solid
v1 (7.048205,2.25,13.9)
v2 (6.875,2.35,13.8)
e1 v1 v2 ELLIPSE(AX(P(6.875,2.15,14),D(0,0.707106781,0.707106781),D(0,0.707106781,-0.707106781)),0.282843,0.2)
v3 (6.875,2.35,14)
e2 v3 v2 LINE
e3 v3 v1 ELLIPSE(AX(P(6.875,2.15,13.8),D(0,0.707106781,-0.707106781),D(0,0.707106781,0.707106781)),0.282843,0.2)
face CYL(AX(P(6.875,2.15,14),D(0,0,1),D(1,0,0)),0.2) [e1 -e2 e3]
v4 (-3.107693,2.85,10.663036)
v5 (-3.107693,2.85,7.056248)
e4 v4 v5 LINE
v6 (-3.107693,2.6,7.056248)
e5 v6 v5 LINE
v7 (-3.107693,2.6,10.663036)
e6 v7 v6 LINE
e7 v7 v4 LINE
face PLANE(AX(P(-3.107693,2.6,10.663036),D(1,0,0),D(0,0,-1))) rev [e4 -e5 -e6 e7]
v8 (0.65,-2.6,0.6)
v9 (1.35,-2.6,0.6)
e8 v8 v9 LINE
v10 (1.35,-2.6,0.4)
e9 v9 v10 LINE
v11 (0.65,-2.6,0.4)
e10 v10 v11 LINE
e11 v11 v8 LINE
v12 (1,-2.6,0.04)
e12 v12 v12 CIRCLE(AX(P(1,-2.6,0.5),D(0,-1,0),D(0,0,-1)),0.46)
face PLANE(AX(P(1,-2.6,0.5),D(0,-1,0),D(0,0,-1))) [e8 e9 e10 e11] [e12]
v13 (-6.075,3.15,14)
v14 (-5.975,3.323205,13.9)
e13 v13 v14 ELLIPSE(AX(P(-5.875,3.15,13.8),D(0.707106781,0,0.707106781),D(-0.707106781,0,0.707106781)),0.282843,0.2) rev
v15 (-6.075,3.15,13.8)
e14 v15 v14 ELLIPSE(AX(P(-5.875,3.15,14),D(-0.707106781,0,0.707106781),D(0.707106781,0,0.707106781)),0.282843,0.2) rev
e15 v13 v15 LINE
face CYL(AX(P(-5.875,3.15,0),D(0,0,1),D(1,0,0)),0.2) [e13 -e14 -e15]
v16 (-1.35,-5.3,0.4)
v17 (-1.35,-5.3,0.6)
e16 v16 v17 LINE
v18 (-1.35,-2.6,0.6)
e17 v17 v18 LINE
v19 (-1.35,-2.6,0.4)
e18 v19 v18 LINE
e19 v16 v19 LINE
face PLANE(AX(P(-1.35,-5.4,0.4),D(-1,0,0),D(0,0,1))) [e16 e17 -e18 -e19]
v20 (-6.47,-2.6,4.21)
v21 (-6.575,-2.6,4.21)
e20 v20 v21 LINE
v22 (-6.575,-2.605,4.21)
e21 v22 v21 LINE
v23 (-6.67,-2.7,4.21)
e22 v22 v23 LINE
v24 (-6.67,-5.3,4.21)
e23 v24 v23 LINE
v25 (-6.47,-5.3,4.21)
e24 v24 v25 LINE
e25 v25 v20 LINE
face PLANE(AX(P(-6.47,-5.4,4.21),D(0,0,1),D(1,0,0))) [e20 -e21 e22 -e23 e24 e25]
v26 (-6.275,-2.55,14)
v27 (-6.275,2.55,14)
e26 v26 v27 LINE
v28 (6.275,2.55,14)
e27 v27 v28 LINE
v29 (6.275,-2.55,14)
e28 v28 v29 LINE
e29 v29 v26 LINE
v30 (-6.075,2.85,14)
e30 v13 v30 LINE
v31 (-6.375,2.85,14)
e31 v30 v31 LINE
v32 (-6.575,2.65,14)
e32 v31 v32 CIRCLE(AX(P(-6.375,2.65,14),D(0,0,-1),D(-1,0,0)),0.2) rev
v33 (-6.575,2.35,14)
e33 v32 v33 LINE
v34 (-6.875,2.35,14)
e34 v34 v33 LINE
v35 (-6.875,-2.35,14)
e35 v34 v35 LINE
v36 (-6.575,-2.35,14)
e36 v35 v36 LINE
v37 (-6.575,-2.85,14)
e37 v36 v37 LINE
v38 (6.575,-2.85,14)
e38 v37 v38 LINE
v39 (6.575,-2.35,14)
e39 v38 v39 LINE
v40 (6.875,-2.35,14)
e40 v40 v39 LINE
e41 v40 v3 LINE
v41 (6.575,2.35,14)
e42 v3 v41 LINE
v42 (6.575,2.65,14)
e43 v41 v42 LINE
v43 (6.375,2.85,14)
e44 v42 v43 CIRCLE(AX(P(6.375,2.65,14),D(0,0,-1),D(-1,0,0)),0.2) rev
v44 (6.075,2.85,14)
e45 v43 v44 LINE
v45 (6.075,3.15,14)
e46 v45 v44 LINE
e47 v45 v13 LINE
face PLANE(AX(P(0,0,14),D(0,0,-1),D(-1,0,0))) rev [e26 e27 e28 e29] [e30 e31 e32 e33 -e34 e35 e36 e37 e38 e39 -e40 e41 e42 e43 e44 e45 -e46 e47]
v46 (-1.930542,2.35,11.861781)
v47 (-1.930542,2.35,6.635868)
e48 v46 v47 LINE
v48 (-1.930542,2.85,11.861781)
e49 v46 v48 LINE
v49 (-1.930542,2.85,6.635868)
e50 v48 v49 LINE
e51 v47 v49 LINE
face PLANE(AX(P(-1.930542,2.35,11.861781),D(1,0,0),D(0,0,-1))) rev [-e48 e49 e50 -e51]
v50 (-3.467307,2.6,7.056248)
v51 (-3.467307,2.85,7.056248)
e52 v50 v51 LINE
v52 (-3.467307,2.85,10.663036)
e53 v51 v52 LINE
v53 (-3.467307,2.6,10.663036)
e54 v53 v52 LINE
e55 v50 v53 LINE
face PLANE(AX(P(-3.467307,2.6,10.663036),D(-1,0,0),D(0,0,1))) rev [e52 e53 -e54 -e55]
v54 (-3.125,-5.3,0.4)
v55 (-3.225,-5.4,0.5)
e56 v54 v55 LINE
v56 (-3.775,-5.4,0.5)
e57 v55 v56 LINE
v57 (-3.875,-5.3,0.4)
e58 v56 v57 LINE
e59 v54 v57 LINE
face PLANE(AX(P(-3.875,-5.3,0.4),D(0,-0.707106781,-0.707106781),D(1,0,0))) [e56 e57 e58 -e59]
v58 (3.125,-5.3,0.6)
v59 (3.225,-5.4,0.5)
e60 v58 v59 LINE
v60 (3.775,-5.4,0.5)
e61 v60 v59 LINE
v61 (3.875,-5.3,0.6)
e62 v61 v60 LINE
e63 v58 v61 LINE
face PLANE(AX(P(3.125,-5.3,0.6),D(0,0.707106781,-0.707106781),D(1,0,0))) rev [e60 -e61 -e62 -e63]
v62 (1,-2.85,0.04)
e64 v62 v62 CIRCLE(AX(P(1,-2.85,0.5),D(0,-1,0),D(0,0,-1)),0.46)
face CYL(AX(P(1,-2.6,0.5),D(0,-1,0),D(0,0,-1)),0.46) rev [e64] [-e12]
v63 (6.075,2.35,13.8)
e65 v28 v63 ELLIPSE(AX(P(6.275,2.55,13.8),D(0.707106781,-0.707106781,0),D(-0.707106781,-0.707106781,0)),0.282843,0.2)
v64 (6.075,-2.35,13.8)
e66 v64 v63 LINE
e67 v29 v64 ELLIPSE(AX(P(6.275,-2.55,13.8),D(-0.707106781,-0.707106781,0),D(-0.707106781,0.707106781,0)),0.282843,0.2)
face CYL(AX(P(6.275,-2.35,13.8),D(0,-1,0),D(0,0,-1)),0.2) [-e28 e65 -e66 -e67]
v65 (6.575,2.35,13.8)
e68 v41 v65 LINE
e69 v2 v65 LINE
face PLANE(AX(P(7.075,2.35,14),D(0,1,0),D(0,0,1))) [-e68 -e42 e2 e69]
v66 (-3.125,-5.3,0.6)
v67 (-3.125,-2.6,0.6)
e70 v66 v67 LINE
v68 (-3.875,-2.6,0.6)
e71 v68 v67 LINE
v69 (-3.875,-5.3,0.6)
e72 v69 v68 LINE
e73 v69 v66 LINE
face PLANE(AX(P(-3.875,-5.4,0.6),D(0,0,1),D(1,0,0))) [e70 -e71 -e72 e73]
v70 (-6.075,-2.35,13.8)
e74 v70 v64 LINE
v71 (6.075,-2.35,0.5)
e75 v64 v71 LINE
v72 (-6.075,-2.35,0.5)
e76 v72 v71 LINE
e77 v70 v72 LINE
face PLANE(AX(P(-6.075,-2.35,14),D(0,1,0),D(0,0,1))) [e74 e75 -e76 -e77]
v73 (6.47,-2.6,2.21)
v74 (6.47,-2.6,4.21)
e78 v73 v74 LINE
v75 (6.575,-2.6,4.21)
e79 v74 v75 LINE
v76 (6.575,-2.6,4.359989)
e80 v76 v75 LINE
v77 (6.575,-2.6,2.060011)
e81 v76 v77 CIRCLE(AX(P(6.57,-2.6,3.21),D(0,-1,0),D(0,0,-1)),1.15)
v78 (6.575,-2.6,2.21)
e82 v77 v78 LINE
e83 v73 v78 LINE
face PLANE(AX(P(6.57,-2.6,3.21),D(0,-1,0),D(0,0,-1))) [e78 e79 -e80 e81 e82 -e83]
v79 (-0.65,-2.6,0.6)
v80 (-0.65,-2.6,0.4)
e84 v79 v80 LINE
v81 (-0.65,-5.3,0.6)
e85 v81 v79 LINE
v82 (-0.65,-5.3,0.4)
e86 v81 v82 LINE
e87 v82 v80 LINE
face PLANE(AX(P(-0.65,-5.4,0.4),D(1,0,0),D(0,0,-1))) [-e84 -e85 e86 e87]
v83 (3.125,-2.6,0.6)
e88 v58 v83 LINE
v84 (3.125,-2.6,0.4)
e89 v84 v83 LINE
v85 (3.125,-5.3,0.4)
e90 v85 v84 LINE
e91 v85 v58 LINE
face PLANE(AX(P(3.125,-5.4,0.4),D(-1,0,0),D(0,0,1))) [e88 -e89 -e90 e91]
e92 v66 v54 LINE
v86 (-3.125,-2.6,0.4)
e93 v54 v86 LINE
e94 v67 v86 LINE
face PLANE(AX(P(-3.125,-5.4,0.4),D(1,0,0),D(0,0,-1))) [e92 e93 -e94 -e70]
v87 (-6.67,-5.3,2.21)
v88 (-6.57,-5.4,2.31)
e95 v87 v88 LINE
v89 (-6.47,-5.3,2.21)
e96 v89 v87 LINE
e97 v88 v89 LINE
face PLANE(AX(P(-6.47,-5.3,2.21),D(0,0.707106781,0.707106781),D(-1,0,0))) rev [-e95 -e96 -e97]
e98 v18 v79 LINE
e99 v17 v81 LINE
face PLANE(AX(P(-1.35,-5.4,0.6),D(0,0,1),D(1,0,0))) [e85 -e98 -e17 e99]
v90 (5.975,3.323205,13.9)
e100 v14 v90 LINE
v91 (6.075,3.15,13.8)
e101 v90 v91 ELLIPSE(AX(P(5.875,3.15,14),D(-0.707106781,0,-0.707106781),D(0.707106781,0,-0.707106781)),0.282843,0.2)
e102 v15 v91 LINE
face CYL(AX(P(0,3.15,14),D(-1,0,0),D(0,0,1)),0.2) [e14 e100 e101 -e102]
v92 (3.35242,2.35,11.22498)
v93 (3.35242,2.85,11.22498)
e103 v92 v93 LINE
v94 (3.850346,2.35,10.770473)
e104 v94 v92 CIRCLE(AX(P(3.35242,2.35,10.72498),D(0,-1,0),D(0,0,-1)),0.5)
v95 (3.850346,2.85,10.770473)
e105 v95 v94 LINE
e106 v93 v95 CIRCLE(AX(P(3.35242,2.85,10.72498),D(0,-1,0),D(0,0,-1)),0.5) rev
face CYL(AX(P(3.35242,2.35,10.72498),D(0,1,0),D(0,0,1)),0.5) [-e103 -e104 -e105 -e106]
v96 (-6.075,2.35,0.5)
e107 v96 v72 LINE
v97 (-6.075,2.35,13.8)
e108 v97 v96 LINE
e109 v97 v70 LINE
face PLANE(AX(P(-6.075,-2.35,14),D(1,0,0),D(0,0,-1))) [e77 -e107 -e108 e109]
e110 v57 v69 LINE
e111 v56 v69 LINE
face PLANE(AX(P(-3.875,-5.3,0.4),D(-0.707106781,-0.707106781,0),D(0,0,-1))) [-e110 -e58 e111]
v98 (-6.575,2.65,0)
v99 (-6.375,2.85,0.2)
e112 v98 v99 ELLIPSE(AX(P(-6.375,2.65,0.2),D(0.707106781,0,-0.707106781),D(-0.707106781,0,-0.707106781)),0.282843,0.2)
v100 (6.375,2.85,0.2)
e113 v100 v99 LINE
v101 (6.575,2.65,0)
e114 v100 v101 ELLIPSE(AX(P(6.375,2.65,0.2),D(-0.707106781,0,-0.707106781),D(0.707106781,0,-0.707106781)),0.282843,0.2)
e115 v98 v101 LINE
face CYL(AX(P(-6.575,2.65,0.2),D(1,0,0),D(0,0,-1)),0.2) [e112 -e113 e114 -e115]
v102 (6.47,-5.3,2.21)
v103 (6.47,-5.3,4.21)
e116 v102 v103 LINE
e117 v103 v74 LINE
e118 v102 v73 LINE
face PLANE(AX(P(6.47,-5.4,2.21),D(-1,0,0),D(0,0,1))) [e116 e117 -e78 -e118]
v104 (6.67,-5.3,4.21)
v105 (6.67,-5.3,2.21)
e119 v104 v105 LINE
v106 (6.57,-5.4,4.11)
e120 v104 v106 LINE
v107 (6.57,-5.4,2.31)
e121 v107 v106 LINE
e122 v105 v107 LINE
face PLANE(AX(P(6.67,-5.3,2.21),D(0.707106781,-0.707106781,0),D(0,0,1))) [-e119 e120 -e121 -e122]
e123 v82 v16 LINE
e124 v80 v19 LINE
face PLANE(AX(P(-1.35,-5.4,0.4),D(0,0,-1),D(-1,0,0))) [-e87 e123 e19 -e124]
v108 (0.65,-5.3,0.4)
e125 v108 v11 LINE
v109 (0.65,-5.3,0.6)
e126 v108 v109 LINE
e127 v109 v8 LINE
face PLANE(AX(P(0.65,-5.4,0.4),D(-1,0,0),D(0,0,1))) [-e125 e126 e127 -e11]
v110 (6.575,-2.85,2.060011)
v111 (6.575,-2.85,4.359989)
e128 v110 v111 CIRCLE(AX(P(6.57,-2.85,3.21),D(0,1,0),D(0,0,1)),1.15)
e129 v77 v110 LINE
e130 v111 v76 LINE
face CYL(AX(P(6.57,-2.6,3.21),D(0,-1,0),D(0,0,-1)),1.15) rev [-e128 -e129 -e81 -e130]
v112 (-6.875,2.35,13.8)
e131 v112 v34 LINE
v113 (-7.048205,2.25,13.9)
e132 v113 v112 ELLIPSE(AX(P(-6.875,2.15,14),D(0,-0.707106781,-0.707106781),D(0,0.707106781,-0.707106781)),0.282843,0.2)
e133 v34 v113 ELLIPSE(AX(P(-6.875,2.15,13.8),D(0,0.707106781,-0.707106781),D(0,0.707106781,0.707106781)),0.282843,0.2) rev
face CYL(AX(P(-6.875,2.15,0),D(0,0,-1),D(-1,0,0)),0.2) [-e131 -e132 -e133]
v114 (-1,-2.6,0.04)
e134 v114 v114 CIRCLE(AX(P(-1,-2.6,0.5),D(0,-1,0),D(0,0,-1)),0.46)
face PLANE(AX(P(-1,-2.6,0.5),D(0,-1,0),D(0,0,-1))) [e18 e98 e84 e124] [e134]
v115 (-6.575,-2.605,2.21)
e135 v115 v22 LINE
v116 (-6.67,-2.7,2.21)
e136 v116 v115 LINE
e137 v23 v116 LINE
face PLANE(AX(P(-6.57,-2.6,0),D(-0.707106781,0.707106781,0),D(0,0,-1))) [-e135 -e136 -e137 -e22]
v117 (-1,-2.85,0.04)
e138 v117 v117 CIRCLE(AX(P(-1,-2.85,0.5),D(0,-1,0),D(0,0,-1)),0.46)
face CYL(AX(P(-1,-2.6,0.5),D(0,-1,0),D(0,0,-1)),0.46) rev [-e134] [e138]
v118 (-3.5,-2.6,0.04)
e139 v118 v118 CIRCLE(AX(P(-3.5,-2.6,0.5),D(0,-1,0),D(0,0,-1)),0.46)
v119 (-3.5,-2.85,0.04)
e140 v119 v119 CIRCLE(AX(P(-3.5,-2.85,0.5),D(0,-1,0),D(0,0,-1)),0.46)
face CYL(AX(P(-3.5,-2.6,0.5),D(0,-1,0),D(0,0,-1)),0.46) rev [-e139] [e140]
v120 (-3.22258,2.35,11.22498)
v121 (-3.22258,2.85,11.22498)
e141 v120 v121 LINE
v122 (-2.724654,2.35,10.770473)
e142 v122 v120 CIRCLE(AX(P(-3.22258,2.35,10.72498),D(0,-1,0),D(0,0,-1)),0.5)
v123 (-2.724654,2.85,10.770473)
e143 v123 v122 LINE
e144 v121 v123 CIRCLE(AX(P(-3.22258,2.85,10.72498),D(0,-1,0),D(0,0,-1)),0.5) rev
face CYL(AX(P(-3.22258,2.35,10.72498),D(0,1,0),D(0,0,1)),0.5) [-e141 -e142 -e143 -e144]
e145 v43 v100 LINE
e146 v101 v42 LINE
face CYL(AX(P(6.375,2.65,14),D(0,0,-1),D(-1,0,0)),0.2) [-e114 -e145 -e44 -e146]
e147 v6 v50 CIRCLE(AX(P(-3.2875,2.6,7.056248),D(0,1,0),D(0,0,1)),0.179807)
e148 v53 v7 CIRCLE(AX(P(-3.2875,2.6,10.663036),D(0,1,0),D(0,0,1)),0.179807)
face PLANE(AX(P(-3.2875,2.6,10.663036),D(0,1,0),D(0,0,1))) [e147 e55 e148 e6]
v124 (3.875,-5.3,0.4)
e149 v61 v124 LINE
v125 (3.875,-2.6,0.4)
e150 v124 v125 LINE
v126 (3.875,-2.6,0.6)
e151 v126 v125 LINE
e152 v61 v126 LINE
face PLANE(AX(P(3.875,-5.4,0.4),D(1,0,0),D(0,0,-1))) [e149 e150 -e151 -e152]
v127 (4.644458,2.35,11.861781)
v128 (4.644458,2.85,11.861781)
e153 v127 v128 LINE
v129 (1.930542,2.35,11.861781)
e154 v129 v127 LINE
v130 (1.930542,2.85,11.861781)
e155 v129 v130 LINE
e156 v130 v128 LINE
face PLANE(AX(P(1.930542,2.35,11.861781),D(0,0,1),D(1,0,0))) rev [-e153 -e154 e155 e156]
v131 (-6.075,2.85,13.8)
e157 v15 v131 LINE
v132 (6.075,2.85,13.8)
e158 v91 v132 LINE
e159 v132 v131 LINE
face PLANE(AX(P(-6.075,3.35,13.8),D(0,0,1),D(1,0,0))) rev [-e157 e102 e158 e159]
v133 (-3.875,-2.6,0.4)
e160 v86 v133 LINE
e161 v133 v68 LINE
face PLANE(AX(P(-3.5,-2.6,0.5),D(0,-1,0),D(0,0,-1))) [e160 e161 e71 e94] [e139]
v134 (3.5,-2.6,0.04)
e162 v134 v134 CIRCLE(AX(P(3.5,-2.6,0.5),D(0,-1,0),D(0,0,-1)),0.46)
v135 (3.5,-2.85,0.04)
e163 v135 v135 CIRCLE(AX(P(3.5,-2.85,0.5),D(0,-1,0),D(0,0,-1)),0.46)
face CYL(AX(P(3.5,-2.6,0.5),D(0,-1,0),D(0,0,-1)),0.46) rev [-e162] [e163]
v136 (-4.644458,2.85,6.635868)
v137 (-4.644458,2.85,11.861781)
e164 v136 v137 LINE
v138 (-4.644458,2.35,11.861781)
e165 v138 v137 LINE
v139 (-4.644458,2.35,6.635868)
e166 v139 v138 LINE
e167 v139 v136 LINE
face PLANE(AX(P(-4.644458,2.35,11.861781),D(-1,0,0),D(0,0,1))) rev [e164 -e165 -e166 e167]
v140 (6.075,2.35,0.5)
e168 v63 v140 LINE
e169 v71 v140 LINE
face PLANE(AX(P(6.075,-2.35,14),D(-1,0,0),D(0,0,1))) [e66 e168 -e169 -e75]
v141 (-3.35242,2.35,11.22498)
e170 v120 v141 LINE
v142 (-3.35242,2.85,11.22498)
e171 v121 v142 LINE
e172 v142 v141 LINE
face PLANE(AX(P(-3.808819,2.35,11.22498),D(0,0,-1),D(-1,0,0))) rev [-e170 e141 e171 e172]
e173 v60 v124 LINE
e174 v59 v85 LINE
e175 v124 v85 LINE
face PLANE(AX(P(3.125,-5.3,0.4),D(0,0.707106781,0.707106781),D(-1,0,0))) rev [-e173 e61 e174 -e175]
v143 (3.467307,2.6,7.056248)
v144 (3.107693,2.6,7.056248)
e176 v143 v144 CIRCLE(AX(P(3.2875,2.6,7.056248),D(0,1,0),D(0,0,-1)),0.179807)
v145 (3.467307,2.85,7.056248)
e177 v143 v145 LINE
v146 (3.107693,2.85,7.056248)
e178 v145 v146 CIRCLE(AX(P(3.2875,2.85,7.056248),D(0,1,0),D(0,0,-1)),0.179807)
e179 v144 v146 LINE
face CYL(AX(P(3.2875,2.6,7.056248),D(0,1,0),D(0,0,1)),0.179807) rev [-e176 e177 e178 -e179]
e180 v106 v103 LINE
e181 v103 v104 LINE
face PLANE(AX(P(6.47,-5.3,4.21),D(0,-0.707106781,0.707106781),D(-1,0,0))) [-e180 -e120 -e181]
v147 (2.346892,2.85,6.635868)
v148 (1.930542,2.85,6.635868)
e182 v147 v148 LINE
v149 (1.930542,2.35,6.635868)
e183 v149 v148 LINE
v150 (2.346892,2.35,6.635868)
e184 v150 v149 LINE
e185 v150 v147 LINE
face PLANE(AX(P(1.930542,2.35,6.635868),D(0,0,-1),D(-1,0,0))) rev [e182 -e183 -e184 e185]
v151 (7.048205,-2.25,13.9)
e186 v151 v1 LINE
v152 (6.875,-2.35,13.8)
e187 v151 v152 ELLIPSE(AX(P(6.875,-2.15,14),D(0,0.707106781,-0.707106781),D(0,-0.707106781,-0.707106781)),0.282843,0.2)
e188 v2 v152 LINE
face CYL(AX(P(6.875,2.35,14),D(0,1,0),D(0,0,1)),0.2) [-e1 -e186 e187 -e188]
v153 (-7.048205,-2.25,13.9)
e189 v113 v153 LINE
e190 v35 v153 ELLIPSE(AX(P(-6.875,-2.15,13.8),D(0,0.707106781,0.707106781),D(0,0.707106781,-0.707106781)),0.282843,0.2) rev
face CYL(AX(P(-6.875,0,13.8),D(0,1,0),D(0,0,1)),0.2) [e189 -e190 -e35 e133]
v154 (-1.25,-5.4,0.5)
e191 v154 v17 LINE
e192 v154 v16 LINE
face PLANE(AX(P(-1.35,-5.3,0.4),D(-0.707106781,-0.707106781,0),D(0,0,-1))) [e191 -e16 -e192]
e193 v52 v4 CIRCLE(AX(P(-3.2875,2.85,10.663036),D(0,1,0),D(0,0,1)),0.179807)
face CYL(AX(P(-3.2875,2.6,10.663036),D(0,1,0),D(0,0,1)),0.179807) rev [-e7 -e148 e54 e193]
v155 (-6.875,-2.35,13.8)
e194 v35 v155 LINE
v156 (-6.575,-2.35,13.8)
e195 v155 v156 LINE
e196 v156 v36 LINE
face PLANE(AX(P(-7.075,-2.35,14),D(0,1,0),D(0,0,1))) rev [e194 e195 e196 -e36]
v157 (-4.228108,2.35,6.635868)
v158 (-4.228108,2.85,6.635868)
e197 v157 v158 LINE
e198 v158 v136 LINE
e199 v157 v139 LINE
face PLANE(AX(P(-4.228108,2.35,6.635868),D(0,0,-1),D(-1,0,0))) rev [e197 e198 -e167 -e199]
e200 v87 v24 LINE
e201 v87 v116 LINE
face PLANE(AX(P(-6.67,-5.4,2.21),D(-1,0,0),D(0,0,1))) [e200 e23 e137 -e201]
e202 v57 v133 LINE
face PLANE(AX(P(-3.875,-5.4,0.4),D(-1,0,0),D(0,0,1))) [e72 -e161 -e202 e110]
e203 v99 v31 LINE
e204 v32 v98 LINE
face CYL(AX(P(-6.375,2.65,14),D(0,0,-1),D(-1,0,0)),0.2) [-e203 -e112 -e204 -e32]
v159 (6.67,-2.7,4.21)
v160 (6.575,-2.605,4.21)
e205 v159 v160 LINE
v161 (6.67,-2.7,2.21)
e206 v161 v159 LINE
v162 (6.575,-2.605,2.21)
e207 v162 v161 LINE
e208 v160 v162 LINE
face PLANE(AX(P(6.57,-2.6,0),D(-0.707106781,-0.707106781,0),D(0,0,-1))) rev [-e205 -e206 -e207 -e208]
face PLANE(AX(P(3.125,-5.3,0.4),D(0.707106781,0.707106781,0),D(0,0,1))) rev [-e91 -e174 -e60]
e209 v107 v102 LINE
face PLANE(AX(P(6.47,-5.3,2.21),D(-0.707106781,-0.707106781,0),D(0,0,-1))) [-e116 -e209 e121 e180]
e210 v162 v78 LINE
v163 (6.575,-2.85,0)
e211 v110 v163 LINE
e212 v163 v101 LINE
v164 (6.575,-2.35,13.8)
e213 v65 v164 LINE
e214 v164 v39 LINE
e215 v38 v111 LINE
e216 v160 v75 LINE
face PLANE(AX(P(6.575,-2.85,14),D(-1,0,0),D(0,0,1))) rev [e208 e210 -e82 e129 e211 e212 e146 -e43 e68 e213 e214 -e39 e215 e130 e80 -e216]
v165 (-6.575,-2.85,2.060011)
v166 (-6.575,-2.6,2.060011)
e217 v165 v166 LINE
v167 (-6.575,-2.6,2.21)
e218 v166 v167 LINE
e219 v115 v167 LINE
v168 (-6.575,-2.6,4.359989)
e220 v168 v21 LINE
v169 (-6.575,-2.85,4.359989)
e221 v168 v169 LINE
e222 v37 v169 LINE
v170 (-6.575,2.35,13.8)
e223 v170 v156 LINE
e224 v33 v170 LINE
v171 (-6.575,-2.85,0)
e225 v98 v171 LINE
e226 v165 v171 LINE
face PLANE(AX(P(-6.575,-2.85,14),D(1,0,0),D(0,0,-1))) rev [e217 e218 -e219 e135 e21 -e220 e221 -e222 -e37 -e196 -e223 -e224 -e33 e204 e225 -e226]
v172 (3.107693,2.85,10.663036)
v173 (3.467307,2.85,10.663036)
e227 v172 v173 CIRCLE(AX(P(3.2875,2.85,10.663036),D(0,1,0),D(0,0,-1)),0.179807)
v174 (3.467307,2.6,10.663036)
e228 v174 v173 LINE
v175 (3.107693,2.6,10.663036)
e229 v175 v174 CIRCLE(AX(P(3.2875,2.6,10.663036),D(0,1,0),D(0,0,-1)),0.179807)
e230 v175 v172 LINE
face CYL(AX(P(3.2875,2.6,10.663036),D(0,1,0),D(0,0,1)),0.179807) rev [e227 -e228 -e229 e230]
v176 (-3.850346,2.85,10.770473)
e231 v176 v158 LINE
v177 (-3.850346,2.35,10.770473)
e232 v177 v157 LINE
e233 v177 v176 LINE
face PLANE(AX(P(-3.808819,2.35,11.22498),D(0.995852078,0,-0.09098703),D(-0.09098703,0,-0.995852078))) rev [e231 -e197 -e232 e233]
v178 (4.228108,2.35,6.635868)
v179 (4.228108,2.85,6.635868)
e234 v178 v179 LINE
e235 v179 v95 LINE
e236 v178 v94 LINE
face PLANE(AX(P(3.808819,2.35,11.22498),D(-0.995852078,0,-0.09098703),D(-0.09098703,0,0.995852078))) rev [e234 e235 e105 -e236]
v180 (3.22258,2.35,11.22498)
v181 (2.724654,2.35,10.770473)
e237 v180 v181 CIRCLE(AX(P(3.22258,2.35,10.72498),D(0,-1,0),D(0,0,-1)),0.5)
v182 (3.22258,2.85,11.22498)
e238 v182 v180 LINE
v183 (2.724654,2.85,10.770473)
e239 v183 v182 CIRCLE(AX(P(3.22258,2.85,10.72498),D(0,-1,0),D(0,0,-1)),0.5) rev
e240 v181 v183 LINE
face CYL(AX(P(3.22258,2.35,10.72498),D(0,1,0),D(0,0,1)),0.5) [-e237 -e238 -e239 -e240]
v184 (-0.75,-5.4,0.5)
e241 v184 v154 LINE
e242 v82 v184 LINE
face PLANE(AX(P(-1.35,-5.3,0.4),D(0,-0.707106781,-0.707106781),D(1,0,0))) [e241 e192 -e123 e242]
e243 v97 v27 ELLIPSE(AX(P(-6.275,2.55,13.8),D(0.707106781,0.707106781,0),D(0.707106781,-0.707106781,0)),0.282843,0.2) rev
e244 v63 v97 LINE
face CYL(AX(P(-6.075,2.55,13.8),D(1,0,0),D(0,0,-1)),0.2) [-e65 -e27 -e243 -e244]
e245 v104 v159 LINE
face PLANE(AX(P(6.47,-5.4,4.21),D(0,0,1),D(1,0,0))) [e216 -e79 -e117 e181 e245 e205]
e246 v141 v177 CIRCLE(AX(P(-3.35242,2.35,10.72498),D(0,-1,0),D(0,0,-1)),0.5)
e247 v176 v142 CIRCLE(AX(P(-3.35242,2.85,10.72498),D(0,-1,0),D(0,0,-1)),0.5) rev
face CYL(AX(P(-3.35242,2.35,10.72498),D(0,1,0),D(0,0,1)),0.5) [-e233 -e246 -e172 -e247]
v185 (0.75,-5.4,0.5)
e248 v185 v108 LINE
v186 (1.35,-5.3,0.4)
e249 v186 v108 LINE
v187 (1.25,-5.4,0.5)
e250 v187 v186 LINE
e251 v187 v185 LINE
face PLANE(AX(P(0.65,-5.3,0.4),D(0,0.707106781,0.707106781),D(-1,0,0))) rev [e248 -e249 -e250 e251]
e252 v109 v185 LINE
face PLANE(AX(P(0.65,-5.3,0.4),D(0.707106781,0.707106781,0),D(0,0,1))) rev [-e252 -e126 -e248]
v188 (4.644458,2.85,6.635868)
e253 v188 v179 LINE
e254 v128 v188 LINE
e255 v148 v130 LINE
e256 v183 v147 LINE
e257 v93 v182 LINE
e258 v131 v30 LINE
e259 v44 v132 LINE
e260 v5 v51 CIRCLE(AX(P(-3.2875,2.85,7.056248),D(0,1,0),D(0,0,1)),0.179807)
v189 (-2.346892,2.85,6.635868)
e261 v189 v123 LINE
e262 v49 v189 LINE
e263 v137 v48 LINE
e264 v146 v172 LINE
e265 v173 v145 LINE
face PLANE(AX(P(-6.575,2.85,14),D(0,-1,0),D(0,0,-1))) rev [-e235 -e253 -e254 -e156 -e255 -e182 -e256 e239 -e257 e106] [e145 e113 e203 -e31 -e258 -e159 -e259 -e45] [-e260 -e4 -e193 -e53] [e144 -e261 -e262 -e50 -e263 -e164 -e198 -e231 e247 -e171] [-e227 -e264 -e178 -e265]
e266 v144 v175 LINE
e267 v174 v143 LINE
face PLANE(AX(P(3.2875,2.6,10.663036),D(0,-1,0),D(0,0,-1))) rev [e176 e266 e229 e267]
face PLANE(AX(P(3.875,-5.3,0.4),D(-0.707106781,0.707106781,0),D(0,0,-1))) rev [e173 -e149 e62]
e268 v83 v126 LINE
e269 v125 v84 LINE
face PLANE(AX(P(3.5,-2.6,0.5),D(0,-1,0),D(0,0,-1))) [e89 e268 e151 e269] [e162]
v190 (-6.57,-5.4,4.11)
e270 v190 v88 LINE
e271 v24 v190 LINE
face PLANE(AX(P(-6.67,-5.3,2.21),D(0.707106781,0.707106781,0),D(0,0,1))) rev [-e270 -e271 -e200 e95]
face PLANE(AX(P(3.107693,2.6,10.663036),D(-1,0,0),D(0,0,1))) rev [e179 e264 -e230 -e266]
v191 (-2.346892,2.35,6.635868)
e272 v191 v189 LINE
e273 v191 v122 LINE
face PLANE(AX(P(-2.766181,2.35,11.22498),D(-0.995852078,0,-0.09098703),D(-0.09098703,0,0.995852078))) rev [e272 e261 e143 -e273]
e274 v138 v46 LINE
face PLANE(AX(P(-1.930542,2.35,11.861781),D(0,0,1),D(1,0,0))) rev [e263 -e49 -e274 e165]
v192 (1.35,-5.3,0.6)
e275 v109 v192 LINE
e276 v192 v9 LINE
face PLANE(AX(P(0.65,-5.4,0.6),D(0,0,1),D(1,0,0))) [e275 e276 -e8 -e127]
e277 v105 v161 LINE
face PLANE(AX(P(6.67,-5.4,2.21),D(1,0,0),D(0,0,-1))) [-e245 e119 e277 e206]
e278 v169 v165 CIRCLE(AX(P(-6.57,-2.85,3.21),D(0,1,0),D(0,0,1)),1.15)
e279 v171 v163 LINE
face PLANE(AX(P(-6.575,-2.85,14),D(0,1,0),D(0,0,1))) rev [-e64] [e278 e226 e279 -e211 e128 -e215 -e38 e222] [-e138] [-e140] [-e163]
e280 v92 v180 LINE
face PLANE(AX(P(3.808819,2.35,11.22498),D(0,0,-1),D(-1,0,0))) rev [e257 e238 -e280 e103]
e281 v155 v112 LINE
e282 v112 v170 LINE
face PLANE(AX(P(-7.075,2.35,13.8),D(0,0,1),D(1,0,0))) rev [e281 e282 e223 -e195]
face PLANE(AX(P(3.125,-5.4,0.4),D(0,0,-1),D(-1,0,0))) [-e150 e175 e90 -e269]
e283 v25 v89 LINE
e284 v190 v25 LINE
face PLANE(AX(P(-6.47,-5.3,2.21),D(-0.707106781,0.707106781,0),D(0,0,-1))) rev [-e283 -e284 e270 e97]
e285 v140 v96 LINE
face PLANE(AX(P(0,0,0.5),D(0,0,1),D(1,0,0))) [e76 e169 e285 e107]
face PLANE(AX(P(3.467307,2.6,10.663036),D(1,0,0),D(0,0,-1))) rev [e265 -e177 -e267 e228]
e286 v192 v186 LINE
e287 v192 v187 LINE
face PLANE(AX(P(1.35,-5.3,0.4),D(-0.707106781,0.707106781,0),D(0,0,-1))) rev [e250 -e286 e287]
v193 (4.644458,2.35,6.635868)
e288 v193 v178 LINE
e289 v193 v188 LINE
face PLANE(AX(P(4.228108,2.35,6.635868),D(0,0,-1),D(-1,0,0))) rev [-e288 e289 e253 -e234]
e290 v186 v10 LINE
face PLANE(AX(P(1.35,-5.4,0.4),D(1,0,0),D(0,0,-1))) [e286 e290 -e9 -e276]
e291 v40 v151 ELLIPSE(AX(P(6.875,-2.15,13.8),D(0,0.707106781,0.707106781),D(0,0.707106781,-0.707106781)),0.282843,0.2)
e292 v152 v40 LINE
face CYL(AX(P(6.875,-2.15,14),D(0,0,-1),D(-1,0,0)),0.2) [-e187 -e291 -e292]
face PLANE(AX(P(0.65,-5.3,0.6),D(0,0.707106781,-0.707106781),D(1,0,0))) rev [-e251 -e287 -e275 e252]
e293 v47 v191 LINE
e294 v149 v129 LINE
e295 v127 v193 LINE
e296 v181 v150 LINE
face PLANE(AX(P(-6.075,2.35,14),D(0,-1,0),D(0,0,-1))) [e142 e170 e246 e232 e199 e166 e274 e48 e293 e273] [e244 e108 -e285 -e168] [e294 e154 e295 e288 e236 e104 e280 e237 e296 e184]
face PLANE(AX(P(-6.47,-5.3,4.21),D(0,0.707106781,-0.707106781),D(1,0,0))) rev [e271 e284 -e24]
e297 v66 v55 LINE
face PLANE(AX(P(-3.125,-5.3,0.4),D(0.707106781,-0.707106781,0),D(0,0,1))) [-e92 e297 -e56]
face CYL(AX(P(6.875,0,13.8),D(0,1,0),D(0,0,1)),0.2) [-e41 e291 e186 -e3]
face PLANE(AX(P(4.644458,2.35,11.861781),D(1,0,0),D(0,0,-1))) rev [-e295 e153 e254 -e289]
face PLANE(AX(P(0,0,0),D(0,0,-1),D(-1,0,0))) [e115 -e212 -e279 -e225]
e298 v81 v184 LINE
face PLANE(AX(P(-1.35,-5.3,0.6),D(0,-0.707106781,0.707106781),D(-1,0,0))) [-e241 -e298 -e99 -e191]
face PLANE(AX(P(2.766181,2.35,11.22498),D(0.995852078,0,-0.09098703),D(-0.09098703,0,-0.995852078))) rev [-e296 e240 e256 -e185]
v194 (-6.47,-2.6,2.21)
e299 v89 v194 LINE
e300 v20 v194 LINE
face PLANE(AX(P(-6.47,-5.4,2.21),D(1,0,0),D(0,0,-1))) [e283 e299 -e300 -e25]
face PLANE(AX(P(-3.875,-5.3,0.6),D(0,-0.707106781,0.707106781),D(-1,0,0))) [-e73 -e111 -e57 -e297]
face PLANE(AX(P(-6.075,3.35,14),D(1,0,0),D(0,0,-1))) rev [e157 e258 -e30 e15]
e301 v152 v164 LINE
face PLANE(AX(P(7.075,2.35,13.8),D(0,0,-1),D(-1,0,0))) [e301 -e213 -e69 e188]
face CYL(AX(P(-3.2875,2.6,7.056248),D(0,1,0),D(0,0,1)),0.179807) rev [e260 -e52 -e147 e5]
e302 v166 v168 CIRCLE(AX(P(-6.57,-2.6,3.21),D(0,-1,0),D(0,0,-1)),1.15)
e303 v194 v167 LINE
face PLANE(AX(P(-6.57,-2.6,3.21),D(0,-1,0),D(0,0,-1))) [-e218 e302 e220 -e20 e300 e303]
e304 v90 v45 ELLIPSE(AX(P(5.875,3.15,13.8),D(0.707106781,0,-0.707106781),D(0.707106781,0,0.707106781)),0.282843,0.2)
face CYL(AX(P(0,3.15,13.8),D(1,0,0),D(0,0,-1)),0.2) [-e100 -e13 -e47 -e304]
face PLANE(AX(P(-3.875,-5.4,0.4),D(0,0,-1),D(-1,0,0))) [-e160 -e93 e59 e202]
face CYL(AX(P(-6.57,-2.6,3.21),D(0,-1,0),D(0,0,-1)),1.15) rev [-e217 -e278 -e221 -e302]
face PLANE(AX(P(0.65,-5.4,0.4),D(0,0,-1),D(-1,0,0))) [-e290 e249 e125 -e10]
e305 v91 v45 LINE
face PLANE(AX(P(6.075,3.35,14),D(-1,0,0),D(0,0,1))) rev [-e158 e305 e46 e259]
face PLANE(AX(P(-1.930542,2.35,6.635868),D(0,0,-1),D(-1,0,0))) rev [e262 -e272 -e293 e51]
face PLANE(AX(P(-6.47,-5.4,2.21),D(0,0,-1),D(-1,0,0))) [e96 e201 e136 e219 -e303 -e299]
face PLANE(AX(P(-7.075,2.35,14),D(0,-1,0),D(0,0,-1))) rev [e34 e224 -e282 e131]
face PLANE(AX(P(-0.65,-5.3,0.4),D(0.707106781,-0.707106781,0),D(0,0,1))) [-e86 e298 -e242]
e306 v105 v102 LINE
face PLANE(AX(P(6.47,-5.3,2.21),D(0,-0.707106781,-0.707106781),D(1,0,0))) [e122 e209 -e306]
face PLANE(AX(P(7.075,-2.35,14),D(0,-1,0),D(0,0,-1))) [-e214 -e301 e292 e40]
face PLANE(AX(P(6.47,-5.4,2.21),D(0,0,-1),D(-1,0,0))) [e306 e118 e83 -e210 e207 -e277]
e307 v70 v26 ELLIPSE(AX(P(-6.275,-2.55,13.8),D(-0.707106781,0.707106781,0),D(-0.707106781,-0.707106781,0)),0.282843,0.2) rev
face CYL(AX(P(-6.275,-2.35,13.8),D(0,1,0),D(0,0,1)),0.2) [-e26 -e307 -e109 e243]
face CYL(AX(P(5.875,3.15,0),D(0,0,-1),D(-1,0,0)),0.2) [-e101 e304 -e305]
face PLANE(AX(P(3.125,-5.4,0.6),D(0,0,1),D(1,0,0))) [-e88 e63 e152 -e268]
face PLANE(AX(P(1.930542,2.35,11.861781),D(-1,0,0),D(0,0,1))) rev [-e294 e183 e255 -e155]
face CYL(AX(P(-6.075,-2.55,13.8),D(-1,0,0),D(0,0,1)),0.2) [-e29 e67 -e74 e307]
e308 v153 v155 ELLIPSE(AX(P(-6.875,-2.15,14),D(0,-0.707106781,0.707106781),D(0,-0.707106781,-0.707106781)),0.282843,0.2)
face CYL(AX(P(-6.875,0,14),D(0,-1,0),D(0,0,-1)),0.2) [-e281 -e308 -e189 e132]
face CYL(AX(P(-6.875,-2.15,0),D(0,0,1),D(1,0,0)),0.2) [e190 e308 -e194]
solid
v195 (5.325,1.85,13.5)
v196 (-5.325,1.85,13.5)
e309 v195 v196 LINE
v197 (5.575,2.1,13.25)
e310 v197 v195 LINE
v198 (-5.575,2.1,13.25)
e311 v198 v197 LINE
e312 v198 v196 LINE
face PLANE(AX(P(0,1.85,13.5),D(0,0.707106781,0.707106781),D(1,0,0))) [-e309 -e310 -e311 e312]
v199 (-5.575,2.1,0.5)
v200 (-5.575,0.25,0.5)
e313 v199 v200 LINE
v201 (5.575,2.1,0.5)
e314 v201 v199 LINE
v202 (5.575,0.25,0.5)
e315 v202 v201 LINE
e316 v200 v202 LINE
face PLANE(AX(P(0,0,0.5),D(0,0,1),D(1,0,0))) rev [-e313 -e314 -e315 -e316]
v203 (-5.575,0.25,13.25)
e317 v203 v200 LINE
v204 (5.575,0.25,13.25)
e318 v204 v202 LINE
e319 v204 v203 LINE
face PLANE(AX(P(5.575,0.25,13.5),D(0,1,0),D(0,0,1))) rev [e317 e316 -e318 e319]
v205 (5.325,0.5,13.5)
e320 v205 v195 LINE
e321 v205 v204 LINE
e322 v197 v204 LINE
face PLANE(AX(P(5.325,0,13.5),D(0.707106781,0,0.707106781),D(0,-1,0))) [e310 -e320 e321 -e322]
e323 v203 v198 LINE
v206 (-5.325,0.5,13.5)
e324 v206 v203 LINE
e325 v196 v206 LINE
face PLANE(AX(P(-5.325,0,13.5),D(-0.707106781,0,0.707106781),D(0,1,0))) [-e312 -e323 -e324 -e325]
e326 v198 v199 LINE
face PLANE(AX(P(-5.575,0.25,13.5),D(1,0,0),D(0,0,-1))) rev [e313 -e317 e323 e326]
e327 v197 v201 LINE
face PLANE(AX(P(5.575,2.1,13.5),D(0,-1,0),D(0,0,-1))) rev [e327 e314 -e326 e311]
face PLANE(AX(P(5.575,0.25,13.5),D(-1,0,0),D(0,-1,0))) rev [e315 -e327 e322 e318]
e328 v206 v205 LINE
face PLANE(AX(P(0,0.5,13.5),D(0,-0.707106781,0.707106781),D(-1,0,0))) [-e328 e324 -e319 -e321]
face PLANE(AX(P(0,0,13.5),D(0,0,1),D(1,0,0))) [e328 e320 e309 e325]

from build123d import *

# Parameters (mm, degrees)
SKETCH_1_W             = 13.15
SKETCH_1_H             = 5.7
SKETCH_1_W_2           = 12.15
SKETCH_1_H_2           = 4.7
EXTRUDE_1_DEPTH        = 14
SKETCH_2_W             = 13.15
SKETCH_2_H             = 5.7
EXTRUDE_2_DEPTH        = 0.5
SKETCH_3_W             = 11.15
SKETCH_3_H             = 1.85
EXTRUDE_3_DEPTH        = 13
CHAMFER_1_SIZE         = 0.25
SKETCH_4_R             = 0.46
SKETCH_4_R_2           = 1.15
CUT_EXTRUDE_2_DEPTH    = 0.25
SKETCH_7_W             = 0.75
SKETCH_7_H             = 0.2
SKETCH_7_W_2           = 0.7
SKETCH_7_W_3           = 0.2
SKETCH_7_H_2           = 2
EXTRUDE_4_DEPTH        = 2.8
CHAMFER_3_SIZE         = 0.1
CHAMFER_4_SIZE         = 0.1
CUT_EXTRUDE_3_DEPTH    = 0.5
CUT_EXTRUDE_4_DEPTH    = 0.25
FILLET_1_R             = 0.5
SKETCH_11_W            = 0.2
SKETCH_11_H            = 4.7
EXTRUDE_5_DEPTH        = 0.5
FILLET_2_R             = 0.2
FILLET_2_OF_MIRROR_1_R = 0.2
SKETCH_12_W            = 12.15
SKETCH_12_H            = 0.2
EXTRUDE_6_DEPTH        = 0.5
FILLET_3_R             = 0.2
FILLET_4_R             = 0.2
FILLET_5_R             = 0.2


# Some blends are built 0.0001 mm under size
with BuildPart() as part:
    # 草图1 → 凸台-拉伸1 (new body)
    with BuildSketch(Plane.XY):
        Rectangle(SKETCH_1_W, SKETCH_1_H)
        Rectangle(SKETCH_1_W_2, SKETCH_1_H_2, mode=Mode.SUBTRACT)
    extrude(amount=EXTRUDE_1_DEPTH)

    # 草图2 → 凸台-拉伸2 (add)
    with BuildSketch(Plane.XY):
        Rectangle(SKETCH_2_W, SKETCH_2_H)
    extrude(amount=EXTRUDE_2_DEPTH)

    # 草图4 → 切除-拉伸2 (cut)
    with BuildSketch(Plane.XZ.offset(2.85)):
        with Locations(Location((-1, 0.5, 0), (0, 0, 270))):
            Circle(SKETCH_4_R)
        with Locations(Location((1, 0.5, 0), (0, 0, 270))):
            Circle(SKETCH_4_R)
        with Locations(Location((-3.5, 0.5, 0), (0, 0, 270))):
            Circle(SKETCH_4_R)
        with Locations(Location((3.5, 0.5, 0), (0, 0, 270))):
            Circle(SKETCH_4_R)
        with Locations((-6.57, 3.21)):
            Circle(SKETCH_4_R_2)
        with Locations((6.57, 3.21)):
            Circle(SKETCH_4_R_2)
    extrude(amount=-CUT_EXTRUDE_2_DEPTH, mode=Mode.SUBTRACT)

    # 草图7 → 凸台-拉伸4 (add)
    with BuildSketch(Plane(origin=(0, -2.6, -2.85), x_dir=(-1, 0, 0), z_dir=(0, 1, 0))):
        with Locations((-3.5, 3.35)):
            Rectangle(SKETCH_7_W, SKETCH_7_H)
        with Locations((-1, 3.35)):
            Rectangle(SKETCH_7_W_2, SKETCH_7_H)
        with Locations((3.5, 3.35)):
            Rectangle(SKETCH_7_W, SKETCH_7_H)
        with Locations((1, 3.35)):
            Rectangle(SKETCH_7_W_2, SKETCH_7_H)
        with Locations((6.57, 6.06)):
            Rectangle(SKETCH_7_W_3, SKETCH_7_H_2)
        with Locations((-6.57, 6.06)):
            Rectangle(SKETCH_7_W_3, SKETCH_7_H_2)
    extrude(amount=-EXTRUDE_4_DEPTH)

    # 倒角3
    # the kernel refuses this chamfer: 0.1 mm, written as the material it takes off along each edge
    with BuildSketch(Plane(origin=(6.67, -2.6, 1.952831701), x_dir=(-0.9996219169112966, 0.02749587661058742, 0), z_dir=(0, 0, 1))) as chamfer_3_piece_1_section:
        Polygon((CHAMFER_3_SIZE * 0.999621916911, CHAMFER_3_SIZE * 0.0274958766106), (-CHAMFER_3_SIZE * 0.0274958766106, CHAMFER_3_SIZE * 0.999621916911), (0, 0), align=None)
    chamfer_3_piece_1 = extrude(amount=2.514336598, mode=Mode.PRIVATE)
    chamfer_3_piece_1 = split(chamfer_3_piece_1, bisect_by=Plane(origin=(6.575, -2.63325446, 3.21), z_dir=(1, 0, 0)), keep=Keep.TOP, mode=Mode.PRIVATE)
    add(chamfer_3_piece_1, mode=Mode.SUBTRACT)
    with BuildSketch(Plane(origin=(-6.67, -2.6, 1.952831701), x_dir=(0.9996219169112966, 0.02749587661058742, 0), z_dir=(0, 0, 1))) as chamfer_3_piece_2_section:
        Polygon((CHAMFER_3_SIZE * 0.999621916911, -CHAMFER_3_SIZE * 0.0274958766106), (-CHAMFER_3_SIZE * 0.0274958766106, -CHAMFER_3_SIZE * 0.999621916911), (0, 0), align=None)
    chamfer_3_piece_2 = extrude(amount=2.514336598, mode=Mode.PRIVATE)
    chamfer_3_piece_2 = split(chamfer_3_piece_2, bisect_by=Plane(origin=(-6.575, -2.63325446, 3.21), z_dir=(-1, 0, 0)), keep=Keep.TOP, mode=Mode.PRIVATE)
    add(chamfer_3_piece_2, mode=Mode.SUBTRACT)

    # 倒角4
    chamfer_4_edges = [part.edges().sort_by_distance(p)[0] for p in [
        (-0.65, -5.4, 0.5),
        (-1, -5.4, 0.6),
        (-1.35, -5.4, 0.5),
        (-1, -5.4, 0.4),
        (3.5, -5.4, 0.6),
        (3.125, -5.4, 0.5),
        (3.5, -5.4, 0.4),
        (3.875, -5.4, 0.5),
        (1, -5.4, 0.6),
        (0.65, -5.4, 0.5),
        (1, -5.4, 0.4),
        (1.35, -5.4, 0.5),
        (-6.67, -5.4, 3.21),
        (-6.57, -5.4, 2.21),
        (-6.47, -5.4, 3.21),
        (-6.57, -5.4, 4.21),
        (6.67, -5.4, 3.21),
        (6.57, -5.4, 4.21),
        (6.47, -5.4, 3.21),
        (6.57, -5.4, 2.21),
        (-3.125, -5.4, 0.5),
        (-3.5, -5.4, 0.6),
        (-3.875, -5.4, 0.5),
        (-3.5, -5.4, 0.4),
    ]]
    chamfer(chamfer_4_edges, length=CHAMFER_4_SIZE - 0.0001)  # a hair under: the kernel refuses the full size

    # 草图8 → 切除-拉伸3 (cut)
    with BuildSketch(Plane(origin=(0, 2.85, 0), x_dir=(1, 0, 0), z_dir=(0, 1, 0))):
        Polygon((-3.808819217, -11.224979928), (-2.766180783, -11.224979928), (-2.346891912, -6.635867656), (-1.930541709, -6.635867656), (-1.930541709, -11.86178054), (-4.644458291, -11.86178054), (-4.644458291, -6.635867656), (-4.228108088, -6.635867656), align=None)
        Polygon((3.808819217, -11.224979928), (4.228108088, -6.635867656), (4.644458291, -6.635867656), (4.644458291, -11.86178054), (1.930541709, -11.86178054), (1.930541709, -6.635867656), (2.346891912, -6.635867656), (2.766180783, -11.224979928), align=None)
    extrude(amount=-CUT_EXTRUDE_3_DEPTH, mode=Mode.SUBTRACT)

    # 草图9 → 切除-拉伸4 (cut)
    with BuildSketch(Plane(origin=(0, 2.85, 0), x_dir=(1, 0, 0), z_dir=(0, 1, 0))):
        with BuildLine():
            Line((-3.467306843, -10.663035767), (-3.467306843, -7.056248419))
            ThreePointArc((-3.467306843, -7.056248419), (-3.2875, -6.876441576), (-3.107693157, -7.056248419))
            Line((-3.107693157, -7.056248419), (-3.107693157, -10.663035767))
            ThreePointArc((-3.107693157, -10.663035767), (-3.2875, -10.842842609), (-3.467306843, -10.663035767))
        make_face()
        with BuildLine():
            Line((3.467306843, -10.663035767), (3.467306843, -7.056248419))
            ThreePointArc((3.467306843, -7.056248419), (3.2875, -6.876441576), (3.107693157, -7.056248419))
            Line((3.107693157, -7.056248419), (3.107693157, -10.663035767))
            ThreePointArc((3.107693157, -10.663035767), (3.2875, -10.842842609), (3.467306843, -10.663035767))
        make_face()
    extrude(amount=-CUT_EXTRUDE_4_DEPTH, mode=Mode.SUBTRACT)

    # 圆角1
    fillet_1_edges = [part.edges().sort_by_distance(p)[0] for p in [
        (-3.808819217, 2.6, 11.224979928),
        (-2.766180783, 2.6, 11.224979928),
        (2.766180783, 2.6, 11.224979928),
        (3.808819217, 2.6, 11.224979928),
    ]]
    fillet(fillet_1_edges, radius=FILLET_1_R)

    # 草图11 → 凸台-拉伸5 (add)
    with BuildSketch(Plane.ZY.offset(6.575)):
        with Locations((13.9, 0)):
            Rectangle(SKETCH_11_W, SKETCH_11_H)
    extrude_5 = extrude(amount=EXTRUDE_5_DEPTH)

    # 圆角2
    # the kernel refuses this fillet: 0.2 mm, written as the material it takes off along each edge
    with BuildSketch(Plane(origin=(-7.075, -2.85, 14), x_dir=(1, 0, 0), z_dir=(0, 1, 0)), Plane(origin=(-7.075, 2.85, 13.8), x_dir=(1, 0, 0), z_dir=(0, -1, 0))) as fillet_2_piece_1:
        with BuildLine():
            CenterArc((FILLET_2_R, FILLET_2_R), FILLET_2_R, 180, 90)
            Line((0, FILLET_2_R), (0, 0))
            Line((0, 0), (FILLET_2_R, 0))
        make_face()
    extrude(amount=5.7, mode=Mode.SUBTRACT)
    with BuildSketch(Plane(origin=(-7.075, 2.35, 14.5), x_dir=(1, 0, 0), z_dir=(0, 0, -1)), Plane(origin=(-7.075, -2.35, 13.3), x_dir=(1, 0, 0), z_dir=(0, 0, 1))) as fillet_2_piece_2:
        with BuildLine():
            CenterArc((FILLET_2_R, FILLET_2_R), FILLET_2_R, 180, 90)
            Line((0, FILLET_2_R), (0, 0))
            Line((0, 0), (FILLET_2_R, 0))
        make_face()
    extrude(amount=1.2, mode=Mode.SUBTRACT)

    # 镜向1: 凸台-拉伸5 across plane
    add(extrude_5.mirror(Plane(origin=(0, 0, 0), x_dir=(0, 0, 1), z_dir=(1, 0, 0))))

    # 圆角2 of 镜向1
    # the kernel refuses this fillet: 0.2 mm, written as the material it takes off along each edge
    with BuildSketch(Plane(origin=(7.075, -2.85, 14), x_dir=(-1, 0, 0), z_dir=(0, 1, 0)), Plane(origin=(7.075, 2.85, 13.8), x_dir=(-1, 0, 0), z_dir=(0, -1, 0))) as fillet_2_of_mirror_1_piece_1:
        with BuildLine():
            CenterArc((FILLET_2_OF_MIRROR_1_R, -FILLET_2_OF_MIRROR_1_R), FILLET_2_OF_MIRROR_1_R, 90, 90)
            Line((0, -FILLET_2_OF_MIRROR_1_R), (0, 0))
            Line((0, 0), (FILLET_2_OF_MIRROR_1_R, 0))
        make_face()
    extrude(amount=5.7, mode=Mode.SUBTRACT)
    with BuildSketch(Plane(origin=(7.075, 2.35, 14.5), x_dir=(-1, 0, 0), z_dir=(0, 0, -1)), Plane(origin=(7.075, -2.35, 13.3), x_dir=(-1, 0, 0), z_dir=(0, 0, 1))) as fillet_2_of_mirror_1_piece_2:
        with BuildLine():
            CenterArc((FILLET_2_OF_MIRROR_1_R, -FILLET_2_OF_MIRROR_1_R), FILLET_2_OF_MIRROR_1_R, 90, 90)
            Line((0, -FILLET_2_OF_MIRROR_1_R), (0, 0))
            Line((0, 0), (FILLET_2_OF_MIRROR_1_R, 0))
        make_face()
    extrude(amount=1.2, mode=Mode.SUBTRACT)

    # 草图12 → 凸台-拉伸6 (add)
    with BuildSketch(Plane(origin=(0, 2.85, 0), x_dir=(1, 0, 0), z_dir=(0, 1, 0))):
        with Locations((0, -13.9)):
            Rectangle(SKETCH_12_W, SKETCH_12_H)
    extrude(amount=EXTRUDE_6_DEPTH)

    # 圆角3
    # the kernel refuses this fillet: 0.2 mm, written as the material it takes off along each edge
    with BuildSketch(Plane(origin=(-6.075, 3.35, 13.3), x_dir=(0, -1, 0), z_dir=(0, 0, 1)), Plane(origin=(6.075, 3.35, 14.5), x_dir=(0, -1, 0), z_dir=(0, 0, -1))) as fillet_3_piece_1:
        with BuildLine():
            CenterArc((FILLET_3_R, FILLET_3_R), FILLET_3_R, 180, 90)
            Line((0, FILLET_3_R), (0, 0))
            Line((0, 0), (FILLET_3_R, 0))
        make_face()
    extrude(amount=1.2, mode=Mode.SUBTRACT)
    with BuildSketch(Plane(origin=(-6.575, 3.35, 14), x_dir=(0, -1, 0), z_dir=(1, 0, 0)), Plane(origin=(6.575, 3.35, 13.8), x_dir=(0, -1, 0), z_dir=(-1, 0, 0))) as fillet_3_piece_2:
        with BuildLine():
            CenterArc((FILLET_3_R, FILLET_3_R), FILLET_3_R, 180, 90)
            Line((0, FILLET_3_R), (0, 0))
            Line((0, 0), (FILLET_3_R, 0))
        make_face()
    extrude(amount=13.15, mode=Mode.SUBTRACT)

    # 圆角4
    fillet_4_edges = [part.edges().sort_by_distance(p)[0] for p in [
        (6.075, 0, 14),
        (0, 2.35, 14),
        (-6.075, 0, 14),
        (0, -2.35, 14),
    ]]
    fillet(fillet_4_edges, radius=FILLET_4_R)

    # 圆角5
    fillet_5_edges = [part.edges().sort_by_distance(p)[0] for p in [
        (0, 2.85, 0),
        (-6.575, 2.85, 7),
        (6.575, 2.85, 7),
    ]]
    fillet(fillet_5_edges, radius=FILLET_5_R)


with BuildPart() as body_2:
    # 草图3 → 凸台-拉伸3 (new body)
    with BuildSketch(Plane.XY.offset(0.5)):
        with Locations((0, 1.175)):
            Rectangle(SKETCH_3_W, SKETCH_3_H)
    extrude(amount=EXTRUDE_3_DEPTH)

    # 倒角1
    chamfer_1_edges = [body_2.edges().sort_by_distance(p)[0] for p in [
        (5.575, 1.175, 13.5),
        (0, 2.1, 13.5),
        (-5.575, 1.175, 13.5),
        (0, 0.25, 13.5),
    ]]
    chamfer(chamfer_1_edges, length=CHAMFER_1_SIZE)


solid = Compound([part.part, body_2.part])
